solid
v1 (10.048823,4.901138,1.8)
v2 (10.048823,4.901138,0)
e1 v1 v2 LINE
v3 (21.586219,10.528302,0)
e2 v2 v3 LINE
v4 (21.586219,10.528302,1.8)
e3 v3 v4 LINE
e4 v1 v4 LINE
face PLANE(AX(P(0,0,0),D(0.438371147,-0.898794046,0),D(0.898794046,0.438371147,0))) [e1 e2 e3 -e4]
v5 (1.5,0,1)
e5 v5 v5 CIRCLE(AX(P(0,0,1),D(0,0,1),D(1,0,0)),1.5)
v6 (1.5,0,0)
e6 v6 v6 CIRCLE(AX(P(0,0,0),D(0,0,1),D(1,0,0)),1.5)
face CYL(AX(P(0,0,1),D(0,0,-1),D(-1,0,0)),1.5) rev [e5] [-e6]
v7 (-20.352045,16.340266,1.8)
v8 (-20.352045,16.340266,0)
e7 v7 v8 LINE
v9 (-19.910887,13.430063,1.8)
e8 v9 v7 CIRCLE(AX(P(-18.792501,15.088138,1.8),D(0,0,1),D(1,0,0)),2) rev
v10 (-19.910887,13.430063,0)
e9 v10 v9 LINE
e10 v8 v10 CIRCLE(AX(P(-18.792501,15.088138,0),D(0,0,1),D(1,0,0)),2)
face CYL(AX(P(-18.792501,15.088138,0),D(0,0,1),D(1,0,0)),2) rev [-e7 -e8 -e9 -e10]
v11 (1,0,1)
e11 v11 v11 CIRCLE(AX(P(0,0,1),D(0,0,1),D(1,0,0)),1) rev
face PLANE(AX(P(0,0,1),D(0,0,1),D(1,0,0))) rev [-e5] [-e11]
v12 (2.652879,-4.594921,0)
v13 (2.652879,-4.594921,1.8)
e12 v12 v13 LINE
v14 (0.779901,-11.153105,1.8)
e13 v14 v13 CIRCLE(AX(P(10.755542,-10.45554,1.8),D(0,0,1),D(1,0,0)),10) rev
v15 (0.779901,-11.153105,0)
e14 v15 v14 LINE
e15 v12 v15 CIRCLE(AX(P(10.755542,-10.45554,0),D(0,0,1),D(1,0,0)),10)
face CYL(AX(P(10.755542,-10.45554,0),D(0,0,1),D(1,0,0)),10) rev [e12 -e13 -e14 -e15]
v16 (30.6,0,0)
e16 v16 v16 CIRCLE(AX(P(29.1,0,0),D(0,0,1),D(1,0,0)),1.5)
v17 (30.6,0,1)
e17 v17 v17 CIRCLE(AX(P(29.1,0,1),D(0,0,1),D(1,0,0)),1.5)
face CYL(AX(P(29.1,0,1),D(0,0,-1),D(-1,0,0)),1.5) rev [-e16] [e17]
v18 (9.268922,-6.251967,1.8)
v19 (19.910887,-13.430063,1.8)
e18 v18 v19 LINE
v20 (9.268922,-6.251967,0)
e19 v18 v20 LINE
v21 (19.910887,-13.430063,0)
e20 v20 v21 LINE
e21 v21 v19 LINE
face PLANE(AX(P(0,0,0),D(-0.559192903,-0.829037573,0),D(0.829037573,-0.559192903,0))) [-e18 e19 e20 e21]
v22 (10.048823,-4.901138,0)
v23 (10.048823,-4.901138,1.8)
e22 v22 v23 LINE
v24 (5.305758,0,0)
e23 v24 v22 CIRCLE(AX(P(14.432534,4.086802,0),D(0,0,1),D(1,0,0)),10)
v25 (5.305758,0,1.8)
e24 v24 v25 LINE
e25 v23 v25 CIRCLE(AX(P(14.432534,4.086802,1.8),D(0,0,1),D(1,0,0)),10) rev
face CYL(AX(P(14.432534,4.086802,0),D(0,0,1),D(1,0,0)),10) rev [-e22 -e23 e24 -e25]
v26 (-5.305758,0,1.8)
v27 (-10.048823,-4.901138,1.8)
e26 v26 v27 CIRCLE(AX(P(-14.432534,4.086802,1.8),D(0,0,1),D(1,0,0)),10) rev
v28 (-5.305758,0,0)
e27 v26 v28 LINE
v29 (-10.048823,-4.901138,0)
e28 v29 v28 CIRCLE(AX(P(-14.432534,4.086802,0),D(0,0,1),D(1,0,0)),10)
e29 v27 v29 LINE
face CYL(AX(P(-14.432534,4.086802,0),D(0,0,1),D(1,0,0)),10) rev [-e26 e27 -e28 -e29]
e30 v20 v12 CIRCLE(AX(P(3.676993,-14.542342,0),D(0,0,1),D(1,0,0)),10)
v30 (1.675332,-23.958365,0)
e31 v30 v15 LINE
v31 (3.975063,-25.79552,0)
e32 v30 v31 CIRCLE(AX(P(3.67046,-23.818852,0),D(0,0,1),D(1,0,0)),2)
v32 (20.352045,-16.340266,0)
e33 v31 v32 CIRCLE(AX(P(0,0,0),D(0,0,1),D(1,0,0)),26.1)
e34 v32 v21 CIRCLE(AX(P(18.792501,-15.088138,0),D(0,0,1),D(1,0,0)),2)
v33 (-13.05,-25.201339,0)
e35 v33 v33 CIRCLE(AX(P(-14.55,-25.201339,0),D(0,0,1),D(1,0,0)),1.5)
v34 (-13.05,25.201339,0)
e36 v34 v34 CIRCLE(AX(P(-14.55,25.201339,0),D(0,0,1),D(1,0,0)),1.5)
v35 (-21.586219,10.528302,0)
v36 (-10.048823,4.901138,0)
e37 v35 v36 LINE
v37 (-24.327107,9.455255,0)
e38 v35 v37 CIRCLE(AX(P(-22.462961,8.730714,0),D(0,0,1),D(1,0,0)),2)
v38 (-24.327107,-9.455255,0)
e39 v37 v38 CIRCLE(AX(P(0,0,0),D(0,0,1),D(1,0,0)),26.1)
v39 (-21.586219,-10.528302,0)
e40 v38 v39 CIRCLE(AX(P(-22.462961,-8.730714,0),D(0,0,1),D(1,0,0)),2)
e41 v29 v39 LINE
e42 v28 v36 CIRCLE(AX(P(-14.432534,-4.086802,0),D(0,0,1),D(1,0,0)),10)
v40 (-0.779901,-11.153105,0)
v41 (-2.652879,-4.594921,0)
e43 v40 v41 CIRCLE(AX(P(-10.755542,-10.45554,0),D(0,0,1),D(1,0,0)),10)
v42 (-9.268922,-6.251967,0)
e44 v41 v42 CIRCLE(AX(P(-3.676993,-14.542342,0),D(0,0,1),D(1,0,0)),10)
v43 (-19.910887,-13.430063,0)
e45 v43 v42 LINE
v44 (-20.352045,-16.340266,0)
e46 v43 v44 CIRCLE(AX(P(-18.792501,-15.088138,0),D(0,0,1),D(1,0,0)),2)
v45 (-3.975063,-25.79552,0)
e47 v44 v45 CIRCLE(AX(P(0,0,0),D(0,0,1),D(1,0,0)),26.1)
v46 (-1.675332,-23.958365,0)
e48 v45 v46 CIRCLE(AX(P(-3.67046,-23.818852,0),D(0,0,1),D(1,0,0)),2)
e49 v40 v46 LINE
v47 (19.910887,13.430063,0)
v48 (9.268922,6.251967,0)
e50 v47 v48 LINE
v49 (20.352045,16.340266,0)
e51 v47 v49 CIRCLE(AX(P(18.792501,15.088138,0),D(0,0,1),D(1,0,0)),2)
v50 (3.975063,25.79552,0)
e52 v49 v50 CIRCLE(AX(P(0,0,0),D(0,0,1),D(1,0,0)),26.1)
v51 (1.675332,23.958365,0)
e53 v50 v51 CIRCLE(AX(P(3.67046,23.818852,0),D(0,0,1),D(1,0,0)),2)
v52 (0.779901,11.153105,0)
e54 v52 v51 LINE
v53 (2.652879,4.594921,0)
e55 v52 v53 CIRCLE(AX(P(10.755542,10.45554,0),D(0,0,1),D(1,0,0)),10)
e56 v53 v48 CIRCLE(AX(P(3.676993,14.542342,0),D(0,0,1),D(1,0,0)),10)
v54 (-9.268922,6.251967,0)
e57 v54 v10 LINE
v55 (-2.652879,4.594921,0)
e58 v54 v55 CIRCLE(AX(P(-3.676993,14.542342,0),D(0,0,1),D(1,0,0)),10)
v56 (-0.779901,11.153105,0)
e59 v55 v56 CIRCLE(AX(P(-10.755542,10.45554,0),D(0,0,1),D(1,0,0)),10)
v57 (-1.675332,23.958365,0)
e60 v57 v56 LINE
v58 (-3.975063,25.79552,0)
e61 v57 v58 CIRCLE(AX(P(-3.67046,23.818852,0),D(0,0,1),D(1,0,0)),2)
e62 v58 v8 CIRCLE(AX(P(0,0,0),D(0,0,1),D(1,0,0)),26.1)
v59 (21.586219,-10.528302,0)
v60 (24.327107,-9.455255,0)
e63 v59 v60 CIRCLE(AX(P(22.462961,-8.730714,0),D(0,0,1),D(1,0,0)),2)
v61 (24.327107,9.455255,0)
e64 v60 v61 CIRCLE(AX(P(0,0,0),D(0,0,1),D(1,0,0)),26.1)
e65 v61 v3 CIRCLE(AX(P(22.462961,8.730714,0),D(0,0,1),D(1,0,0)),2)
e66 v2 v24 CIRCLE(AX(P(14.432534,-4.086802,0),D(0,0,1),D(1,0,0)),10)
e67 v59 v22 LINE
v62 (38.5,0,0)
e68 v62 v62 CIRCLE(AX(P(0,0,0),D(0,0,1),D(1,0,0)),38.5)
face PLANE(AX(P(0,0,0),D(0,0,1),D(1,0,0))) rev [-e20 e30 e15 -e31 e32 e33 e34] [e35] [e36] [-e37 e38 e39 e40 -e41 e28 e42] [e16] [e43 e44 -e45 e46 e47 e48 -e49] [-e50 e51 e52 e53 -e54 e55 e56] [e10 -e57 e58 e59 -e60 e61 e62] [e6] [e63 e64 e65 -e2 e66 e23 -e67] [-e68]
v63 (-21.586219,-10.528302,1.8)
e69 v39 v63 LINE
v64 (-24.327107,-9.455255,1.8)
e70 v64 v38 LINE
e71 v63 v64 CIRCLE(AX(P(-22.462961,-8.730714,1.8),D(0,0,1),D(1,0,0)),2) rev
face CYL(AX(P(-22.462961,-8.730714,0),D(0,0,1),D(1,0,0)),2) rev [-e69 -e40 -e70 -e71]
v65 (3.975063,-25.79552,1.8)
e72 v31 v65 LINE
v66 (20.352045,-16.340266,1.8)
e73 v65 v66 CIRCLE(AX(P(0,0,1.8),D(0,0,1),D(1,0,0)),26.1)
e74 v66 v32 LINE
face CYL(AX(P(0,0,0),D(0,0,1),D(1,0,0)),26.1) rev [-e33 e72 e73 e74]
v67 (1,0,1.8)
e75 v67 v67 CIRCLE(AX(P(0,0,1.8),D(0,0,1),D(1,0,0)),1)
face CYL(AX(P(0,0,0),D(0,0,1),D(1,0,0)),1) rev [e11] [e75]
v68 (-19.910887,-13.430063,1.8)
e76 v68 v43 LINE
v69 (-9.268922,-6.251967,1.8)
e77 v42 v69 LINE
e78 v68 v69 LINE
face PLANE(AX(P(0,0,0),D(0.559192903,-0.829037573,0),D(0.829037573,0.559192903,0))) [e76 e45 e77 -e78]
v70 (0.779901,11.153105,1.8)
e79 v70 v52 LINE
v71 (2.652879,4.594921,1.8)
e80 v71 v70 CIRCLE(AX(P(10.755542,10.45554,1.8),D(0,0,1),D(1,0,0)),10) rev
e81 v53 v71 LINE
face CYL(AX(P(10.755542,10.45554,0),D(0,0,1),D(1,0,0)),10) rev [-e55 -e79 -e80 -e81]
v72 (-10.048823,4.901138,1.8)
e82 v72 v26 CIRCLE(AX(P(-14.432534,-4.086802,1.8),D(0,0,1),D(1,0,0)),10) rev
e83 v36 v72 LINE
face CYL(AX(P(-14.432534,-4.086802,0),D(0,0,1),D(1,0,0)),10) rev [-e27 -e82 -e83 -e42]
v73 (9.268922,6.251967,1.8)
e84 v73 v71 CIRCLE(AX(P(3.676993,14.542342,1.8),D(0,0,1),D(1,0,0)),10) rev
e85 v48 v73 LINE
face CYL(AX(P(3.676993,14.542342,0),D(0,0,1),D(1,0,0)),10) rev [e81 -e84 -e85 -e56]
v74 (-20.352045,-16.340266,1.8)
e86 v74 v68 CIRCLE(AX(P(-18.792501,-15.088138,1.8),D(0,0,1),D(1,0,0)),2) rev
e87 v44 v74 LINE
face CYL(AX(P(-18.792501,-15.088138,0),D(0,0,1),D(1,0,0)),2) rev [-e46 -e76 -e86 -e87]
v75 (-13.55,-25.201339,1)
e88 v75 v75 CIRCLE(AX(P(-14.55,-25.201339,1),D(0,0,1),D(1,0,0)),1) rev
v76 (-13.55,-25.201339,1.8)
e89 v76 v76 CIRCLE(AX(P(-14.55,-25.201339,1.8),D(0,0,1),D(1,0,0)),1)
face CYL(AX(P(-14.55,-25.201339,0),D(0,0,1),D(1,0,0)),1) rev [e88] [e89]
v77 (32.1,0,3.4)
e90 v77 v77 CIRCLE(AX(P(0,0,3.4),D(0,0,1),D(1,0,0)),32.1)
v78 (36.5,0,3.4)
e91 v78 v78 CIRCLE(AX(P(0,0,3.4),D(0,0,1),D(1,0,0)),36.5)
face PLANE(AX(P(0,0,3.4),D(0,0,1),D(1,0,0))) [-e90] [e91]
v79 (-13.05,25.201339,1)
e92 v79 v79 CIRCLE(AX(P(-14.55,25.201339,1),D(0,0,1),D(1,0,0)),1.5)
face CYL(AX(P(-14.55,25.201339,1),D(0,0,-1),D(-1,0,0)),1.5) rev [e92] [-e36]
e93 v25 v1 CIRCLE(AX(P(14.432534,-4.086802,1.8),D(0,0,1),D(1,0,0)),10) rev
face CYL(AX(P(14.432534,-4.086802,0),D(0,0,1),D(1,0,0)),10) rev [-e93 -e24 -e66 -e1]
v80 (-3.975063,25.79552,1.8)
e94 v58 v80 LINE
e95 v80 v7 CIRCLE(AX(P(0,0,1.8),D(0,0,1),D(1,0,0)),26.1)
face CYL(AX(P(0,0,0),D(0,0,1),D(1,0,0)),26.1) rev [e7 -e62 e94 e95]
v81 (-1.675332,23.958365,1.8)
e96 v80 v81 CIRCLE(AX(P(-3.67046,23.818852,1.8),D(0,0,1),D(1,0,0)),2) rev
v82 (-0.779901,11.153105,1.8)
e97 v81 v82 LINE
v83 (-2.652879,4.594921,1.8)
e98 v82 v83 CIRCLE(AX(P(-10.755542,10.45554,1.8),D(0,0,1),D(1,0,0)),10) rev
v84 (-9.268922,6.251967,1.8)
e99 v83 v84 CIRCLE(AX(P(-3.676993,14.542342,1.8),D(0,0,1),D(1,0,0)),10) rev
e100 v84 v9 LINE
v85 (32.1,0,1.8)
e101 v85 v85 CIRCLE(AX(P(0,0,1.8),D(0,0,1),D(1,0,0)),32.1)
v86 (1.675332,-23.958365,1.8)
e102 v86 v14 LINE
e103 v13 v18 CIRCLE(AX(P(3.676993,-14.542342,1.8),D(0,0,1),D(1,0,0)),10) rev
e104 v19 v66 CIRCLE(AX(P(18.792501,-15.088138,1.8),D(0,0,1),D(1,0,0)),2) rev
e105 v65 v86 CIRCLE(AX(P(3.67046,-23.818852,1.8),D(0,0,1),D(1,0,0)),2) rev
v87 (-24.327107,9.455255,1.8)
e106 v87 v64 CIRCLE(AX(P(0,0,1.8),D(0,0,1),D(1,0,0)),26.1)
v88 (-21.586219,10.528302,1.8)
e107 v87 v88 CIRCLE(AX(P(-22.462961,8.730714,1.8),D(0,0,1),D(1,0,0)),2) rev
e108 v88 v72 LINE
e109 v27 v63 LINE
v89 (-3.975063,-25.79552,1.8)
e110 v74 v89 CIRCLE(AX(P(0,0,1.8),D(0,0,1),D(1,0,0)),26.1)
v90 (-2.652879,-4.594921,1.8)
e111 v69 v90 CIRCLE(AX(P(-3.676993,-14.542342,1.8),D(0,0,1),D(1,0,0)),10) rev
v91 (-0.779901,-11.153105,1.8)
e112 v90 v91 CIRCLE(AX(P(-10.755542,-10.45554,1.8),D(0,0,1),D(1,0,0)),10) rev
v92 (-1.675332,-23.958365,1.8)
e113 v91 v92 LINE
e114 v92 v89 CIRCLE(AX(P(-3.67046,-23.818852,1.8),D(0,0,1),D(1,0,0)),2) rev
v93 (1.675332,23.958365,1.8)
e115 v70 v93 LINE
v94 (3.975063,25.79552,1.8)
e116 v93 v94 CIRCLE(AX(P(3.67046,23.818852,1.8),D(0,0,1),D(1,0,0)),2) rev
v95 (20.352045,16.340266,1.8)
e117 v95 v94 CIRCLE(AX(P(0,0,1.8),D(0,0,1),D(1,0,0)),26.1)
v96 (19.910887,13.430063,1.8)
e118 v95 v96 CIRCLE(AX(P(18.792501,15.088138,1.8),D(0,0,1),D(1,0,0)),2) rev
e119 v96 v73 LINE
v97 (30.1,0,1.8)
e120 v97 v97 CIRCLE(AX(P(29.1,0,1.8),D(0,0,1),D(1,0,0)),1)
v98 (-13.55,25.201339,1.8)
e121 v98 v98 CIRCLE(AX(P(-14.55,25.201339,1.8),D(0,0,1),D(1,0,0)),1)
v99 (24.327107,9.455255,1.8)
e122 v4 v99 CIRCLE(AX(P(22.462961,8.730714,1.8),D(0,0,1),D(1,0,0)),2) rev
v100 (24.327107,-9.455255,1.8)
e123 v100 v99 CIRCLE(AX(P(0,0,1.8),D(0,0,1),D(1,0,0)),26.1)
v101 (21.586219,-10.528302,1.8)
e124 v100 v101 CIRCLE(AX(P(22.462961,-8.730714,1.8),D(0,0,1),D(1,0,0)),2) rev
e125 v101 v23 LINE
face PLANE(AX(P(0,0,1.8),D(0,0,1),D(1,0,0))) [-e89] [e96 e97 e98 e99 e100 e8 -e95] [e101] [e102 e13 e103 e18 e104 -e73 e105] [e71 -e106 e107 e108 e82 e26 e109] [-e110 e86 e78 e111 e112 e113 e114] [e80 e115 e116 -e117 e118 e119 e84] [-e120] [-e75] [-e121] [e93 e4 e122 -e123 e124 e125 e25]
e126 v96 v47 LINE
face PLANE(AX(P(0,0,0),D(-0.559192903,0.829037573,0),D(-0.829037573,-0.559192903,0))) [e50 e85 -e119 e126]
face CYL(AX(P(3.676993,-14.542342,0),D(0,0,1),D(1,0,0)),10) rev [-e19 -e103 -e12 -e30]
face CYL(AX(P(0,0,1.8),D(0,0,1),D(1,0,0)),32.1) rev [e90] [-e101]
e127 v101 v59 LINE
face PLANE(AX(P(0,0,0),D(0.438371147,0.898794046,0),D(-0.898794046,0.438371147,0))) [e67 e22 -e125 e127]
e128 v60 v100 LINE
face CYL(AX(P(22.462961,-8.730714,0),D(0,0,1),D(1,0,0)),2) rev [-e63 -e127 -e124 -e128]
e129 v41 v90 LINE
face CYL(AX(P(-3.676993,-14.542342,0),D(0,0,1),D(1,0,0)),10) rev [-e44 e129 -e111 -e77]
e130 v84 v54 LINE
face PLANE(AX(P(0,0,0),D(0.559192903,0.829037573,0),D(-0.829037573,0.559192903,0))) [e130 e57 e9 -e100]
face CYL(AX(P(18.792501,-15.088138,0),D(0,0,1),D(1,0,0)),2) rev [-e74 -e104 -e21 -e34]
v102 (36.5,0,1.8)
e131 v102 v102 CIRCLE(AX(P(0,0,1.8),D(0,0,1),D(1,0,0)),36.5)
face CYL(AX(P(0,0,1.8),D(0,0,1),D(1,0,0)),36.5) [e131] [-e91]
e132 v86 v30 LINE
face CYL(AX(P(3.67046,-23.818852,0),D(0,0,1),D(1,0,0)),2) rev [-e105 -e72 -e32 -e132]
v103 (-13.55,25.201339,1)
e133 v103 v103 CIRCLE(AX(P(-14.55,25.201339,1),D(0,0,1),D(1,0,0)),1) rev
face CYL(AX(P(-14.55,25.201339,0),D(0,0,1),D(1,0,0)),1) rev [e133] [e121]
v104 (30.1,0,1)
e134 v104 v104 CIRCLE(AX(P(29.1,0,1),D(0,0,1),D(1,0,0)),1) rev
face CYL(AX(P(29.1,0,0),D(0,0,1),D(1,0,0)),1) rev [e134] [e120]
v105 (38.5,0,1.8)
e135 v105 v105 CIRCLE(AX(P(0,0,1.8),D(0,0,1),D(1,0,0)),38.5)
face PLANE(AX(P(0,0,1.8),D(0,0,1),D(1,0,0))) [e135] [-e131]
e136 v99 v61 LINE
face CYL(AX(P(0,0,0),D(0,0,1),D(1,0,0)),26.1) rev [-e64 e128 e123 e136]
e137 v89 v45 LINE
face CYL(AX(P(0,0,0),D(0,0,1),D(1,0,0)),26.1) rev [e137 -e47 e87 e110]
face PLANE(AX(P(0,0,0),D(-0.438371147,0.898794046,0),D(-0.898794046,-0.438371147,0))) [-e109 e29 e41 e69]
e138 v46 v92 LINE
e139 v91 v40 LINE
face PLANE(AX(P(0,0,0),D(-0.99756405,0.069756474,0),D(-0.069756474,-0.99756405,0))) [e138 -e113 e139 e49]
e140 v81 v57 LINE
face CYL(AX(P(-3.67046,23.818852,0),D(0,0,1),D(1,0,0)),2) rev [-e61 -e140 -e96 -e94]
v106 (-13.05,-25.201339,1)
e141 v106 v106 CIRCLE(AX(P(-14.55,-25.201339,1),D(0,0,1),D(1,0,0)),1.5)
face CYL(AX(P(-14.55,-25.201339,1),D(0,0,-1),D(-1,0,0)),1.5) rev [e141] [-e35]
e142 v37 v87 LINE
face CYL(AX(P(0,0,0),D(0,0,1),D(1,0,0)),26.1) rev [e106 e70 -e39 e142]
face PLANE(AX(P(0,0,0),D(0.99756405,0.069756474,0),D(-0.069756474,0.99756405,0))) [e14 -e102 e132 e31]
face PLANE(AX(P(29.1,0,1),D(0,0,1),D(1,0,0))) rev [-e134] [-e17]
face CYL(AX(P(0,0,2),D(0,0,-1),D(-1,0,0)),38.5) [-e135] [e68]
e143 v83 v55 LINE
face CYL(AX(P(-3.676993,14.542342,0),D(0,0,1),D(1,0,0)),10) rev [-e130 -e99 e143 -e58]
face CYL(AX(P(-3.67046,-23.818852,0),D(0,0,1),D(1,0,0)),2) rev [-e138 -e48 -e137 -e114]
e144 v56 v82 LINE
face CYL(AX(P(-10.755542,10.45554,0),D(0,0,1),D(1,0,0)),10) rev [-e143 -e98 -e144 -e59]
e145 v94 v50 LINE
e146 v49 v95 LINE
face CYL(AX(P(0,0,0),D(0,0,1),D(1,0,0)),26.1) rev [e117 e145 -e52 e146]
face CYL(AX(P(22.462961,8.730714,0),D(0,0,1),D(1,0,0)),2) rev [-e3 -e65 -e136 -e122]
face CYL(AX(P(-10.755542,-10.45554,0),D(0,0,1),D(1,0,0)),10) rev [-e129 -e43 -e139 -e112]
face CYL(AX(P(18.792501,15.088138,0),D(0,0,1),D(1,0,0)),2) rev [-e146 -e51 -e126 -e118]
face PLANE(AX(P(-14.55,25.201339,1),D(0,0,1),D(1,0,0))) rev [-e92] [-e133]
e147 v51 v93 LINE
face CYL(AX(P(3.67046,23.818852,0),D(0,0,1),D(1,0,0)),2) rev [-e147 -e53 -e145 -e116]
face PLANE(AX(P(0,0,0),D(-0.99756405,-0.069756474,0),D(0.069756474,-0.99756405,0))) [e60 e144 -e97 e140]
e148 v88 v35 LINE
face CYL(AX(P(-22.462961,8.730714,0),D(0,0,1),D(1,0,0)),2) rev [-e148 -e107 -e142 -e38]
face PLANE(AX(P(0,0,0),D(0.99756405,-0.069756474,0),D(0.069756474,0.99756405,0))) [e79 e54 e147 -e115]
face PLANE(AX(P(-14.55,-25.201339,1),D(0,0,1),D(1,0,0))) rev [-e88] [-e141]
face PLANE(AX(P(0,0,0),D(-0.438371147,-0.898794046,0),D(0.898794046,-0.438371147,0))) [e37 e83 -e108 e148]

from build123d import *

# Parameters (mm, degrees)
SKETCH_1_R                       = 38.5
EXTRUDE_1_DEPTH                  = 2
SKETCH_2_OUTSIDE_W               = 100.782
SKETCH_2_OUTSIDE_H               = 100.782
SKETCH_2_OUTSIDE_R               = 36.5
SKETCH_2_OUTSIDE_R_2             = 32.1
CUT_EXTRUDE_1_DEPTH              = 0.2
EXTRUDE_START                    = 1.4
SKETCH_2_2_R                     = 36.5
SKETCH_2_2_R_2                   = 32.1
EXTRUDE_2_DEPTH                  = 1.4
SKETCH_3_R                       = 26.1
CUT_EXTRUDE_2_DEPTH              = 55.47696761
SKETCH_3_3_R                     = 5
EXTRUDE_3_DEPTH                  = 1.8
EXTRUDE_4_DEPTH                  = 1.8
FILLET_1_R                       = 2
PATTERN_CIRCULAR_1_COUNT         = 6
FILLET_1_OF_PATTERN_CIRCULAR_1_R = 2
FILLET_2_R                       = 10
SKETCH_4_R                       = 1
CUT_EXTRUDE_3_DEPTH              = 55.47696761
CUT_EXTRUDE_START                = -1.8
SKETCH_4_3_R                     = 1.5
CUT_EXTRUDE_4_DEPTH              = 1


with BuildPart() as part:
    # 草图1 → 凸台-拉伸1 (new body)
    with BuildSketch(Plane.XY):
        Circle(SKETCH_1_R)
    extrude(amount=EXTRUDE_1_DEPTH)

    # 草图2 outside → 切除-拉伸1 (cut)
    # profile 1 of 2: a face of its own
    with BuildSketch(Plane.XY.offset(2)):
        Rectangle(SKETCH_2_OUTSIDE_W, SKETCH_2_OUTSIDE_H)
        Circle(SKETCH_2_OUTSIDE_R, mode=Mode.SUBTRACT)
    # profile 2 of 2: a face of its own
    with BuildSketch(Plane.XY.offset(2)):
        Circle(SKETCH_2_OUTSIDE_R_2)
    extrude(amount=-CUT_EXTRUDE_1_DEPTH, mode=Mode.SUBTRACT)

    # 草图2<2> → 凸台-拉伸2 (add)
    with BuildSketch(Plane.XY.offset(2).offset(EXTRUDE_START)):
        Circle(SKETCH_2_2_R)
        Circle(SKETCH_2_2_R_2, mode=Mode.SUBTRACT)
    extrude(amount=-EXTRUDE_2_DEPTH)

    # 草图3 → 切除-拉伸2 (cut, through all)
    with BuildSketch(Plane.XY.offset(1.8)):
        Circle(SKETCH_3_R)
    extrude(amount=-CUT_EXTRUDE_2_DEPTH, mode=Mode.SUBTRACT)



with BuildPart() as body_2:
    # 草图3<3> → 凸台-拉伸3 (new, through all)
    with BuildSketch(Plane.XY.offset(1.8)):
        Circle(SKETCH_3_3_R)
    extrude(amount=-EXTRUDE_3_DEPTH)


with BuildPart() as part_1:
    add(part.part)

    add(body_2.part)  # 凸台-拉伸4 merges body 2
    # 草图3<4> → 凸台-拉伸4 (add, through all)
    with BuildSketch(Plane.XY.offset(1.8)):
        with BuildLine():
            ThreePointArc((1.820643965, 26.036421712), (0, 26.1), (-1.820643965, 26.036421712))
            Line((-1.820643965, 26.036421712), (-0.348782369, 4.987820251))
            ThreePointArc((-0.348782369, 4.987820251), (0, 5), (0.348782369, 4.987820251))
            Line((0.348782369, 4.987820251), (1.820643965, 26.036421712))
        make_face()
    extrude_4 = extrude(amount=-EXTRUDE_4_DEPTH)

    # 圆角1
    fillet_1_edges = [part_1.edges().sort_by_distance(p)[0] for p in [
        (-1.820643965, 26.036421712, 0.9),
        (1.820643965, 26.036421712, 0.9),
    ]]
    fillet(fillet_1_edges, radius=FILLET_1_R)

    # 阵列(圆周)1: 凸台-拉伸4 ×6 about axis
    pattern_circular_1_axis = Axis((0, 0, 0), (0, 0, 1))
    for i in range(1, PATTERN_CIRCULAR_1_COUNT):
        add(extrude_4.rotate(pattern_circular_1_axis, i * 360 / PATTERN_CIRCULAR_1_COUNT))

    # 圆角1 of 阵列(圆周)1
    fillet_1_of_pattern_circular_1_edges = [part_1.edges().sort_by_distance(p)[0] for p in [
        (-23.458524608, 11.441486931, 0.9),
        (-21.637880644, 14.594934781, 0.9),
        (-21.637880644, -14.594934781, 0.9),
        (-23.458524608, -11.441486931, 0.9),
        (1.820643965, -26.036421712, 0.9),
        (-1.820643965, -26.036421712, 0.9),
        (23.458524608, -11.441486931, 0.9),
        (21.637880644, -14.594934781, 0.9),
        (21.637880644, 14.594934781, 0.9),
        (23.458524608, 11.441486931, 0.9),
    ]]
    fillet(fillet_1_of_pattern_circular_1_edges, radius=FILLET_1_OF_PATTERN_CIRCULAR_1_R)

    # 圆角2
    # the kernel refuses this fillet: 10 mm, written as the material it adds along each edge
    with BuildSketch(Plane(origin=(4.493970231, -2.191855734, 1.8), x_dir=(0.8987940462991597, -0.4383711467890922, 0), z_dir=(0, 0, -1)), Plane(origin=(0.348782369, -4.987820251, 1.8), x_dir=(0.06975647374410966, -0.9975640502598253, 0), z_dir=(0, 0, -1)), Plane(origin=(-4.145187863, -2.795964517, 1.8), x_dir=(-0.8290375725550504, -0.5591929034707338, 0), z_dir=(0, 0, -1)), Plane(origin=(-4.493970231, 2.191855734, 1.8), x_dir=(-0.8987940462991602, 0.4383711467890914, 0), z_dir=(0, 0, -1)), Plane(origin=(-0.348782369, 4.987820251, 1.8), x_dir=(-0.06975647374410977, 0.9975640502598253, 0), z_dir=(0, 0, -1)), Plane(origin=(4.145187863, 2.795964517, 1.8), x_dir=(0.8290375725550504, 0.5591929034707338, 0), z_dir=(0, 0, -1))) as fillet_2_piece_1:
        with BuildLine():
            CenterArc((6.180339887, -10), FILLET_2_R, 90, 48.189685104)
            ThreePointArc((-1.273220038, -3.333333333), (-0.329138205, -1.784110449), (0, 0))
            Line((0, 0), (6.180339887, 0))
        make_face()
    extrude(amount=1.8)
    with BuildSketch(Plane(origin=(4.493970231, 2.191855734, 1.8), x_dir=(0.8987940462991614, 0.4383711467890888, 0), z_dir=(0, 0, -1)), Plane(origin=(4.145187863, -2.795964517, 1.8), x_dir=(0.8290375725550488, -0.5591929034707364, 0), z_dir=(0, 0, -1)), Plane(origin=(-0.348782369, -4.987820251, 1.8), x_dir=(-0.06975647374411244, -0.9975640502598251, 0), z_dir=(0, 0, -1)), Plane(origin=(-4.493970231, -2.191855734, 1.8), x_dir=(-0.8987940462991615, -0.43837114678908895, 0), z_dir=(0, 0, -1)), Plane(origin=(-4.145187863, 2.795964517, 1.8), x_dir=(-0.8290375725550488, 0.5591929034707362, 0), z_dir=(0, 0, -1)), Plane(origin=(0.348782369, 4.987820251, 1.8), x_dir=(0.06975647374411233, 0.9975640502598251, 0), z_dir=(0, 0, -1))) as fillet_2_piece_2:
        with BuildLine():
            CenterArc((6.180339887, 10), FILLET_2_R, 221.810314896, 48.189685104)
            ThreePointArc((-1.273220038, 3.333333333), (-0.329138205, 1.784110449), (0, 0))
            Line((0, 0), (6.180339887, 0))
        make_face()
    extrude(amount=1.8)

    # 草图4 → 切除-拉伸3 (cut, through all)
    with BuildSketch(Plane.XY.offset(1.8)):
        with Locations((-14.55, 25.20133925)):
            Circle(SKETCH_4_R)
        Circle(SKETCH_4_R)
        with Locations((29.1, 0)):
            Circle(SKETCH_4_R)
        with Locations((-14.55, -25.20133925)):
            Circle(SKETCH_4_R)
    extrude(amount=-CUT_EXTRUDE_3_DEPTH, mode=Mode.SUBTRACT)

    # 草图4<3> → 切除-拉伸4 (cut)
    with BuildSketch(Plane.XY.offset(1.8).offset(CUT_EXTRUDE_START)):
        with Locations((-14.55, 25.20133925)):
            Circle(SKETCH_4_3_R)
        with Locations((29.1, 0)):
            Circle(SKETCH_4_3_R)
        with Locations((-14.55, -25.20133925)):
            Circle(SKETCH_4_3_R)
        Circle(SKETCH_4_3_R)
    extrude(amount=CUT_EXTRUDE_4_DEPTH, mode=Mode.SUBTRACT)


solid = part_1.part
